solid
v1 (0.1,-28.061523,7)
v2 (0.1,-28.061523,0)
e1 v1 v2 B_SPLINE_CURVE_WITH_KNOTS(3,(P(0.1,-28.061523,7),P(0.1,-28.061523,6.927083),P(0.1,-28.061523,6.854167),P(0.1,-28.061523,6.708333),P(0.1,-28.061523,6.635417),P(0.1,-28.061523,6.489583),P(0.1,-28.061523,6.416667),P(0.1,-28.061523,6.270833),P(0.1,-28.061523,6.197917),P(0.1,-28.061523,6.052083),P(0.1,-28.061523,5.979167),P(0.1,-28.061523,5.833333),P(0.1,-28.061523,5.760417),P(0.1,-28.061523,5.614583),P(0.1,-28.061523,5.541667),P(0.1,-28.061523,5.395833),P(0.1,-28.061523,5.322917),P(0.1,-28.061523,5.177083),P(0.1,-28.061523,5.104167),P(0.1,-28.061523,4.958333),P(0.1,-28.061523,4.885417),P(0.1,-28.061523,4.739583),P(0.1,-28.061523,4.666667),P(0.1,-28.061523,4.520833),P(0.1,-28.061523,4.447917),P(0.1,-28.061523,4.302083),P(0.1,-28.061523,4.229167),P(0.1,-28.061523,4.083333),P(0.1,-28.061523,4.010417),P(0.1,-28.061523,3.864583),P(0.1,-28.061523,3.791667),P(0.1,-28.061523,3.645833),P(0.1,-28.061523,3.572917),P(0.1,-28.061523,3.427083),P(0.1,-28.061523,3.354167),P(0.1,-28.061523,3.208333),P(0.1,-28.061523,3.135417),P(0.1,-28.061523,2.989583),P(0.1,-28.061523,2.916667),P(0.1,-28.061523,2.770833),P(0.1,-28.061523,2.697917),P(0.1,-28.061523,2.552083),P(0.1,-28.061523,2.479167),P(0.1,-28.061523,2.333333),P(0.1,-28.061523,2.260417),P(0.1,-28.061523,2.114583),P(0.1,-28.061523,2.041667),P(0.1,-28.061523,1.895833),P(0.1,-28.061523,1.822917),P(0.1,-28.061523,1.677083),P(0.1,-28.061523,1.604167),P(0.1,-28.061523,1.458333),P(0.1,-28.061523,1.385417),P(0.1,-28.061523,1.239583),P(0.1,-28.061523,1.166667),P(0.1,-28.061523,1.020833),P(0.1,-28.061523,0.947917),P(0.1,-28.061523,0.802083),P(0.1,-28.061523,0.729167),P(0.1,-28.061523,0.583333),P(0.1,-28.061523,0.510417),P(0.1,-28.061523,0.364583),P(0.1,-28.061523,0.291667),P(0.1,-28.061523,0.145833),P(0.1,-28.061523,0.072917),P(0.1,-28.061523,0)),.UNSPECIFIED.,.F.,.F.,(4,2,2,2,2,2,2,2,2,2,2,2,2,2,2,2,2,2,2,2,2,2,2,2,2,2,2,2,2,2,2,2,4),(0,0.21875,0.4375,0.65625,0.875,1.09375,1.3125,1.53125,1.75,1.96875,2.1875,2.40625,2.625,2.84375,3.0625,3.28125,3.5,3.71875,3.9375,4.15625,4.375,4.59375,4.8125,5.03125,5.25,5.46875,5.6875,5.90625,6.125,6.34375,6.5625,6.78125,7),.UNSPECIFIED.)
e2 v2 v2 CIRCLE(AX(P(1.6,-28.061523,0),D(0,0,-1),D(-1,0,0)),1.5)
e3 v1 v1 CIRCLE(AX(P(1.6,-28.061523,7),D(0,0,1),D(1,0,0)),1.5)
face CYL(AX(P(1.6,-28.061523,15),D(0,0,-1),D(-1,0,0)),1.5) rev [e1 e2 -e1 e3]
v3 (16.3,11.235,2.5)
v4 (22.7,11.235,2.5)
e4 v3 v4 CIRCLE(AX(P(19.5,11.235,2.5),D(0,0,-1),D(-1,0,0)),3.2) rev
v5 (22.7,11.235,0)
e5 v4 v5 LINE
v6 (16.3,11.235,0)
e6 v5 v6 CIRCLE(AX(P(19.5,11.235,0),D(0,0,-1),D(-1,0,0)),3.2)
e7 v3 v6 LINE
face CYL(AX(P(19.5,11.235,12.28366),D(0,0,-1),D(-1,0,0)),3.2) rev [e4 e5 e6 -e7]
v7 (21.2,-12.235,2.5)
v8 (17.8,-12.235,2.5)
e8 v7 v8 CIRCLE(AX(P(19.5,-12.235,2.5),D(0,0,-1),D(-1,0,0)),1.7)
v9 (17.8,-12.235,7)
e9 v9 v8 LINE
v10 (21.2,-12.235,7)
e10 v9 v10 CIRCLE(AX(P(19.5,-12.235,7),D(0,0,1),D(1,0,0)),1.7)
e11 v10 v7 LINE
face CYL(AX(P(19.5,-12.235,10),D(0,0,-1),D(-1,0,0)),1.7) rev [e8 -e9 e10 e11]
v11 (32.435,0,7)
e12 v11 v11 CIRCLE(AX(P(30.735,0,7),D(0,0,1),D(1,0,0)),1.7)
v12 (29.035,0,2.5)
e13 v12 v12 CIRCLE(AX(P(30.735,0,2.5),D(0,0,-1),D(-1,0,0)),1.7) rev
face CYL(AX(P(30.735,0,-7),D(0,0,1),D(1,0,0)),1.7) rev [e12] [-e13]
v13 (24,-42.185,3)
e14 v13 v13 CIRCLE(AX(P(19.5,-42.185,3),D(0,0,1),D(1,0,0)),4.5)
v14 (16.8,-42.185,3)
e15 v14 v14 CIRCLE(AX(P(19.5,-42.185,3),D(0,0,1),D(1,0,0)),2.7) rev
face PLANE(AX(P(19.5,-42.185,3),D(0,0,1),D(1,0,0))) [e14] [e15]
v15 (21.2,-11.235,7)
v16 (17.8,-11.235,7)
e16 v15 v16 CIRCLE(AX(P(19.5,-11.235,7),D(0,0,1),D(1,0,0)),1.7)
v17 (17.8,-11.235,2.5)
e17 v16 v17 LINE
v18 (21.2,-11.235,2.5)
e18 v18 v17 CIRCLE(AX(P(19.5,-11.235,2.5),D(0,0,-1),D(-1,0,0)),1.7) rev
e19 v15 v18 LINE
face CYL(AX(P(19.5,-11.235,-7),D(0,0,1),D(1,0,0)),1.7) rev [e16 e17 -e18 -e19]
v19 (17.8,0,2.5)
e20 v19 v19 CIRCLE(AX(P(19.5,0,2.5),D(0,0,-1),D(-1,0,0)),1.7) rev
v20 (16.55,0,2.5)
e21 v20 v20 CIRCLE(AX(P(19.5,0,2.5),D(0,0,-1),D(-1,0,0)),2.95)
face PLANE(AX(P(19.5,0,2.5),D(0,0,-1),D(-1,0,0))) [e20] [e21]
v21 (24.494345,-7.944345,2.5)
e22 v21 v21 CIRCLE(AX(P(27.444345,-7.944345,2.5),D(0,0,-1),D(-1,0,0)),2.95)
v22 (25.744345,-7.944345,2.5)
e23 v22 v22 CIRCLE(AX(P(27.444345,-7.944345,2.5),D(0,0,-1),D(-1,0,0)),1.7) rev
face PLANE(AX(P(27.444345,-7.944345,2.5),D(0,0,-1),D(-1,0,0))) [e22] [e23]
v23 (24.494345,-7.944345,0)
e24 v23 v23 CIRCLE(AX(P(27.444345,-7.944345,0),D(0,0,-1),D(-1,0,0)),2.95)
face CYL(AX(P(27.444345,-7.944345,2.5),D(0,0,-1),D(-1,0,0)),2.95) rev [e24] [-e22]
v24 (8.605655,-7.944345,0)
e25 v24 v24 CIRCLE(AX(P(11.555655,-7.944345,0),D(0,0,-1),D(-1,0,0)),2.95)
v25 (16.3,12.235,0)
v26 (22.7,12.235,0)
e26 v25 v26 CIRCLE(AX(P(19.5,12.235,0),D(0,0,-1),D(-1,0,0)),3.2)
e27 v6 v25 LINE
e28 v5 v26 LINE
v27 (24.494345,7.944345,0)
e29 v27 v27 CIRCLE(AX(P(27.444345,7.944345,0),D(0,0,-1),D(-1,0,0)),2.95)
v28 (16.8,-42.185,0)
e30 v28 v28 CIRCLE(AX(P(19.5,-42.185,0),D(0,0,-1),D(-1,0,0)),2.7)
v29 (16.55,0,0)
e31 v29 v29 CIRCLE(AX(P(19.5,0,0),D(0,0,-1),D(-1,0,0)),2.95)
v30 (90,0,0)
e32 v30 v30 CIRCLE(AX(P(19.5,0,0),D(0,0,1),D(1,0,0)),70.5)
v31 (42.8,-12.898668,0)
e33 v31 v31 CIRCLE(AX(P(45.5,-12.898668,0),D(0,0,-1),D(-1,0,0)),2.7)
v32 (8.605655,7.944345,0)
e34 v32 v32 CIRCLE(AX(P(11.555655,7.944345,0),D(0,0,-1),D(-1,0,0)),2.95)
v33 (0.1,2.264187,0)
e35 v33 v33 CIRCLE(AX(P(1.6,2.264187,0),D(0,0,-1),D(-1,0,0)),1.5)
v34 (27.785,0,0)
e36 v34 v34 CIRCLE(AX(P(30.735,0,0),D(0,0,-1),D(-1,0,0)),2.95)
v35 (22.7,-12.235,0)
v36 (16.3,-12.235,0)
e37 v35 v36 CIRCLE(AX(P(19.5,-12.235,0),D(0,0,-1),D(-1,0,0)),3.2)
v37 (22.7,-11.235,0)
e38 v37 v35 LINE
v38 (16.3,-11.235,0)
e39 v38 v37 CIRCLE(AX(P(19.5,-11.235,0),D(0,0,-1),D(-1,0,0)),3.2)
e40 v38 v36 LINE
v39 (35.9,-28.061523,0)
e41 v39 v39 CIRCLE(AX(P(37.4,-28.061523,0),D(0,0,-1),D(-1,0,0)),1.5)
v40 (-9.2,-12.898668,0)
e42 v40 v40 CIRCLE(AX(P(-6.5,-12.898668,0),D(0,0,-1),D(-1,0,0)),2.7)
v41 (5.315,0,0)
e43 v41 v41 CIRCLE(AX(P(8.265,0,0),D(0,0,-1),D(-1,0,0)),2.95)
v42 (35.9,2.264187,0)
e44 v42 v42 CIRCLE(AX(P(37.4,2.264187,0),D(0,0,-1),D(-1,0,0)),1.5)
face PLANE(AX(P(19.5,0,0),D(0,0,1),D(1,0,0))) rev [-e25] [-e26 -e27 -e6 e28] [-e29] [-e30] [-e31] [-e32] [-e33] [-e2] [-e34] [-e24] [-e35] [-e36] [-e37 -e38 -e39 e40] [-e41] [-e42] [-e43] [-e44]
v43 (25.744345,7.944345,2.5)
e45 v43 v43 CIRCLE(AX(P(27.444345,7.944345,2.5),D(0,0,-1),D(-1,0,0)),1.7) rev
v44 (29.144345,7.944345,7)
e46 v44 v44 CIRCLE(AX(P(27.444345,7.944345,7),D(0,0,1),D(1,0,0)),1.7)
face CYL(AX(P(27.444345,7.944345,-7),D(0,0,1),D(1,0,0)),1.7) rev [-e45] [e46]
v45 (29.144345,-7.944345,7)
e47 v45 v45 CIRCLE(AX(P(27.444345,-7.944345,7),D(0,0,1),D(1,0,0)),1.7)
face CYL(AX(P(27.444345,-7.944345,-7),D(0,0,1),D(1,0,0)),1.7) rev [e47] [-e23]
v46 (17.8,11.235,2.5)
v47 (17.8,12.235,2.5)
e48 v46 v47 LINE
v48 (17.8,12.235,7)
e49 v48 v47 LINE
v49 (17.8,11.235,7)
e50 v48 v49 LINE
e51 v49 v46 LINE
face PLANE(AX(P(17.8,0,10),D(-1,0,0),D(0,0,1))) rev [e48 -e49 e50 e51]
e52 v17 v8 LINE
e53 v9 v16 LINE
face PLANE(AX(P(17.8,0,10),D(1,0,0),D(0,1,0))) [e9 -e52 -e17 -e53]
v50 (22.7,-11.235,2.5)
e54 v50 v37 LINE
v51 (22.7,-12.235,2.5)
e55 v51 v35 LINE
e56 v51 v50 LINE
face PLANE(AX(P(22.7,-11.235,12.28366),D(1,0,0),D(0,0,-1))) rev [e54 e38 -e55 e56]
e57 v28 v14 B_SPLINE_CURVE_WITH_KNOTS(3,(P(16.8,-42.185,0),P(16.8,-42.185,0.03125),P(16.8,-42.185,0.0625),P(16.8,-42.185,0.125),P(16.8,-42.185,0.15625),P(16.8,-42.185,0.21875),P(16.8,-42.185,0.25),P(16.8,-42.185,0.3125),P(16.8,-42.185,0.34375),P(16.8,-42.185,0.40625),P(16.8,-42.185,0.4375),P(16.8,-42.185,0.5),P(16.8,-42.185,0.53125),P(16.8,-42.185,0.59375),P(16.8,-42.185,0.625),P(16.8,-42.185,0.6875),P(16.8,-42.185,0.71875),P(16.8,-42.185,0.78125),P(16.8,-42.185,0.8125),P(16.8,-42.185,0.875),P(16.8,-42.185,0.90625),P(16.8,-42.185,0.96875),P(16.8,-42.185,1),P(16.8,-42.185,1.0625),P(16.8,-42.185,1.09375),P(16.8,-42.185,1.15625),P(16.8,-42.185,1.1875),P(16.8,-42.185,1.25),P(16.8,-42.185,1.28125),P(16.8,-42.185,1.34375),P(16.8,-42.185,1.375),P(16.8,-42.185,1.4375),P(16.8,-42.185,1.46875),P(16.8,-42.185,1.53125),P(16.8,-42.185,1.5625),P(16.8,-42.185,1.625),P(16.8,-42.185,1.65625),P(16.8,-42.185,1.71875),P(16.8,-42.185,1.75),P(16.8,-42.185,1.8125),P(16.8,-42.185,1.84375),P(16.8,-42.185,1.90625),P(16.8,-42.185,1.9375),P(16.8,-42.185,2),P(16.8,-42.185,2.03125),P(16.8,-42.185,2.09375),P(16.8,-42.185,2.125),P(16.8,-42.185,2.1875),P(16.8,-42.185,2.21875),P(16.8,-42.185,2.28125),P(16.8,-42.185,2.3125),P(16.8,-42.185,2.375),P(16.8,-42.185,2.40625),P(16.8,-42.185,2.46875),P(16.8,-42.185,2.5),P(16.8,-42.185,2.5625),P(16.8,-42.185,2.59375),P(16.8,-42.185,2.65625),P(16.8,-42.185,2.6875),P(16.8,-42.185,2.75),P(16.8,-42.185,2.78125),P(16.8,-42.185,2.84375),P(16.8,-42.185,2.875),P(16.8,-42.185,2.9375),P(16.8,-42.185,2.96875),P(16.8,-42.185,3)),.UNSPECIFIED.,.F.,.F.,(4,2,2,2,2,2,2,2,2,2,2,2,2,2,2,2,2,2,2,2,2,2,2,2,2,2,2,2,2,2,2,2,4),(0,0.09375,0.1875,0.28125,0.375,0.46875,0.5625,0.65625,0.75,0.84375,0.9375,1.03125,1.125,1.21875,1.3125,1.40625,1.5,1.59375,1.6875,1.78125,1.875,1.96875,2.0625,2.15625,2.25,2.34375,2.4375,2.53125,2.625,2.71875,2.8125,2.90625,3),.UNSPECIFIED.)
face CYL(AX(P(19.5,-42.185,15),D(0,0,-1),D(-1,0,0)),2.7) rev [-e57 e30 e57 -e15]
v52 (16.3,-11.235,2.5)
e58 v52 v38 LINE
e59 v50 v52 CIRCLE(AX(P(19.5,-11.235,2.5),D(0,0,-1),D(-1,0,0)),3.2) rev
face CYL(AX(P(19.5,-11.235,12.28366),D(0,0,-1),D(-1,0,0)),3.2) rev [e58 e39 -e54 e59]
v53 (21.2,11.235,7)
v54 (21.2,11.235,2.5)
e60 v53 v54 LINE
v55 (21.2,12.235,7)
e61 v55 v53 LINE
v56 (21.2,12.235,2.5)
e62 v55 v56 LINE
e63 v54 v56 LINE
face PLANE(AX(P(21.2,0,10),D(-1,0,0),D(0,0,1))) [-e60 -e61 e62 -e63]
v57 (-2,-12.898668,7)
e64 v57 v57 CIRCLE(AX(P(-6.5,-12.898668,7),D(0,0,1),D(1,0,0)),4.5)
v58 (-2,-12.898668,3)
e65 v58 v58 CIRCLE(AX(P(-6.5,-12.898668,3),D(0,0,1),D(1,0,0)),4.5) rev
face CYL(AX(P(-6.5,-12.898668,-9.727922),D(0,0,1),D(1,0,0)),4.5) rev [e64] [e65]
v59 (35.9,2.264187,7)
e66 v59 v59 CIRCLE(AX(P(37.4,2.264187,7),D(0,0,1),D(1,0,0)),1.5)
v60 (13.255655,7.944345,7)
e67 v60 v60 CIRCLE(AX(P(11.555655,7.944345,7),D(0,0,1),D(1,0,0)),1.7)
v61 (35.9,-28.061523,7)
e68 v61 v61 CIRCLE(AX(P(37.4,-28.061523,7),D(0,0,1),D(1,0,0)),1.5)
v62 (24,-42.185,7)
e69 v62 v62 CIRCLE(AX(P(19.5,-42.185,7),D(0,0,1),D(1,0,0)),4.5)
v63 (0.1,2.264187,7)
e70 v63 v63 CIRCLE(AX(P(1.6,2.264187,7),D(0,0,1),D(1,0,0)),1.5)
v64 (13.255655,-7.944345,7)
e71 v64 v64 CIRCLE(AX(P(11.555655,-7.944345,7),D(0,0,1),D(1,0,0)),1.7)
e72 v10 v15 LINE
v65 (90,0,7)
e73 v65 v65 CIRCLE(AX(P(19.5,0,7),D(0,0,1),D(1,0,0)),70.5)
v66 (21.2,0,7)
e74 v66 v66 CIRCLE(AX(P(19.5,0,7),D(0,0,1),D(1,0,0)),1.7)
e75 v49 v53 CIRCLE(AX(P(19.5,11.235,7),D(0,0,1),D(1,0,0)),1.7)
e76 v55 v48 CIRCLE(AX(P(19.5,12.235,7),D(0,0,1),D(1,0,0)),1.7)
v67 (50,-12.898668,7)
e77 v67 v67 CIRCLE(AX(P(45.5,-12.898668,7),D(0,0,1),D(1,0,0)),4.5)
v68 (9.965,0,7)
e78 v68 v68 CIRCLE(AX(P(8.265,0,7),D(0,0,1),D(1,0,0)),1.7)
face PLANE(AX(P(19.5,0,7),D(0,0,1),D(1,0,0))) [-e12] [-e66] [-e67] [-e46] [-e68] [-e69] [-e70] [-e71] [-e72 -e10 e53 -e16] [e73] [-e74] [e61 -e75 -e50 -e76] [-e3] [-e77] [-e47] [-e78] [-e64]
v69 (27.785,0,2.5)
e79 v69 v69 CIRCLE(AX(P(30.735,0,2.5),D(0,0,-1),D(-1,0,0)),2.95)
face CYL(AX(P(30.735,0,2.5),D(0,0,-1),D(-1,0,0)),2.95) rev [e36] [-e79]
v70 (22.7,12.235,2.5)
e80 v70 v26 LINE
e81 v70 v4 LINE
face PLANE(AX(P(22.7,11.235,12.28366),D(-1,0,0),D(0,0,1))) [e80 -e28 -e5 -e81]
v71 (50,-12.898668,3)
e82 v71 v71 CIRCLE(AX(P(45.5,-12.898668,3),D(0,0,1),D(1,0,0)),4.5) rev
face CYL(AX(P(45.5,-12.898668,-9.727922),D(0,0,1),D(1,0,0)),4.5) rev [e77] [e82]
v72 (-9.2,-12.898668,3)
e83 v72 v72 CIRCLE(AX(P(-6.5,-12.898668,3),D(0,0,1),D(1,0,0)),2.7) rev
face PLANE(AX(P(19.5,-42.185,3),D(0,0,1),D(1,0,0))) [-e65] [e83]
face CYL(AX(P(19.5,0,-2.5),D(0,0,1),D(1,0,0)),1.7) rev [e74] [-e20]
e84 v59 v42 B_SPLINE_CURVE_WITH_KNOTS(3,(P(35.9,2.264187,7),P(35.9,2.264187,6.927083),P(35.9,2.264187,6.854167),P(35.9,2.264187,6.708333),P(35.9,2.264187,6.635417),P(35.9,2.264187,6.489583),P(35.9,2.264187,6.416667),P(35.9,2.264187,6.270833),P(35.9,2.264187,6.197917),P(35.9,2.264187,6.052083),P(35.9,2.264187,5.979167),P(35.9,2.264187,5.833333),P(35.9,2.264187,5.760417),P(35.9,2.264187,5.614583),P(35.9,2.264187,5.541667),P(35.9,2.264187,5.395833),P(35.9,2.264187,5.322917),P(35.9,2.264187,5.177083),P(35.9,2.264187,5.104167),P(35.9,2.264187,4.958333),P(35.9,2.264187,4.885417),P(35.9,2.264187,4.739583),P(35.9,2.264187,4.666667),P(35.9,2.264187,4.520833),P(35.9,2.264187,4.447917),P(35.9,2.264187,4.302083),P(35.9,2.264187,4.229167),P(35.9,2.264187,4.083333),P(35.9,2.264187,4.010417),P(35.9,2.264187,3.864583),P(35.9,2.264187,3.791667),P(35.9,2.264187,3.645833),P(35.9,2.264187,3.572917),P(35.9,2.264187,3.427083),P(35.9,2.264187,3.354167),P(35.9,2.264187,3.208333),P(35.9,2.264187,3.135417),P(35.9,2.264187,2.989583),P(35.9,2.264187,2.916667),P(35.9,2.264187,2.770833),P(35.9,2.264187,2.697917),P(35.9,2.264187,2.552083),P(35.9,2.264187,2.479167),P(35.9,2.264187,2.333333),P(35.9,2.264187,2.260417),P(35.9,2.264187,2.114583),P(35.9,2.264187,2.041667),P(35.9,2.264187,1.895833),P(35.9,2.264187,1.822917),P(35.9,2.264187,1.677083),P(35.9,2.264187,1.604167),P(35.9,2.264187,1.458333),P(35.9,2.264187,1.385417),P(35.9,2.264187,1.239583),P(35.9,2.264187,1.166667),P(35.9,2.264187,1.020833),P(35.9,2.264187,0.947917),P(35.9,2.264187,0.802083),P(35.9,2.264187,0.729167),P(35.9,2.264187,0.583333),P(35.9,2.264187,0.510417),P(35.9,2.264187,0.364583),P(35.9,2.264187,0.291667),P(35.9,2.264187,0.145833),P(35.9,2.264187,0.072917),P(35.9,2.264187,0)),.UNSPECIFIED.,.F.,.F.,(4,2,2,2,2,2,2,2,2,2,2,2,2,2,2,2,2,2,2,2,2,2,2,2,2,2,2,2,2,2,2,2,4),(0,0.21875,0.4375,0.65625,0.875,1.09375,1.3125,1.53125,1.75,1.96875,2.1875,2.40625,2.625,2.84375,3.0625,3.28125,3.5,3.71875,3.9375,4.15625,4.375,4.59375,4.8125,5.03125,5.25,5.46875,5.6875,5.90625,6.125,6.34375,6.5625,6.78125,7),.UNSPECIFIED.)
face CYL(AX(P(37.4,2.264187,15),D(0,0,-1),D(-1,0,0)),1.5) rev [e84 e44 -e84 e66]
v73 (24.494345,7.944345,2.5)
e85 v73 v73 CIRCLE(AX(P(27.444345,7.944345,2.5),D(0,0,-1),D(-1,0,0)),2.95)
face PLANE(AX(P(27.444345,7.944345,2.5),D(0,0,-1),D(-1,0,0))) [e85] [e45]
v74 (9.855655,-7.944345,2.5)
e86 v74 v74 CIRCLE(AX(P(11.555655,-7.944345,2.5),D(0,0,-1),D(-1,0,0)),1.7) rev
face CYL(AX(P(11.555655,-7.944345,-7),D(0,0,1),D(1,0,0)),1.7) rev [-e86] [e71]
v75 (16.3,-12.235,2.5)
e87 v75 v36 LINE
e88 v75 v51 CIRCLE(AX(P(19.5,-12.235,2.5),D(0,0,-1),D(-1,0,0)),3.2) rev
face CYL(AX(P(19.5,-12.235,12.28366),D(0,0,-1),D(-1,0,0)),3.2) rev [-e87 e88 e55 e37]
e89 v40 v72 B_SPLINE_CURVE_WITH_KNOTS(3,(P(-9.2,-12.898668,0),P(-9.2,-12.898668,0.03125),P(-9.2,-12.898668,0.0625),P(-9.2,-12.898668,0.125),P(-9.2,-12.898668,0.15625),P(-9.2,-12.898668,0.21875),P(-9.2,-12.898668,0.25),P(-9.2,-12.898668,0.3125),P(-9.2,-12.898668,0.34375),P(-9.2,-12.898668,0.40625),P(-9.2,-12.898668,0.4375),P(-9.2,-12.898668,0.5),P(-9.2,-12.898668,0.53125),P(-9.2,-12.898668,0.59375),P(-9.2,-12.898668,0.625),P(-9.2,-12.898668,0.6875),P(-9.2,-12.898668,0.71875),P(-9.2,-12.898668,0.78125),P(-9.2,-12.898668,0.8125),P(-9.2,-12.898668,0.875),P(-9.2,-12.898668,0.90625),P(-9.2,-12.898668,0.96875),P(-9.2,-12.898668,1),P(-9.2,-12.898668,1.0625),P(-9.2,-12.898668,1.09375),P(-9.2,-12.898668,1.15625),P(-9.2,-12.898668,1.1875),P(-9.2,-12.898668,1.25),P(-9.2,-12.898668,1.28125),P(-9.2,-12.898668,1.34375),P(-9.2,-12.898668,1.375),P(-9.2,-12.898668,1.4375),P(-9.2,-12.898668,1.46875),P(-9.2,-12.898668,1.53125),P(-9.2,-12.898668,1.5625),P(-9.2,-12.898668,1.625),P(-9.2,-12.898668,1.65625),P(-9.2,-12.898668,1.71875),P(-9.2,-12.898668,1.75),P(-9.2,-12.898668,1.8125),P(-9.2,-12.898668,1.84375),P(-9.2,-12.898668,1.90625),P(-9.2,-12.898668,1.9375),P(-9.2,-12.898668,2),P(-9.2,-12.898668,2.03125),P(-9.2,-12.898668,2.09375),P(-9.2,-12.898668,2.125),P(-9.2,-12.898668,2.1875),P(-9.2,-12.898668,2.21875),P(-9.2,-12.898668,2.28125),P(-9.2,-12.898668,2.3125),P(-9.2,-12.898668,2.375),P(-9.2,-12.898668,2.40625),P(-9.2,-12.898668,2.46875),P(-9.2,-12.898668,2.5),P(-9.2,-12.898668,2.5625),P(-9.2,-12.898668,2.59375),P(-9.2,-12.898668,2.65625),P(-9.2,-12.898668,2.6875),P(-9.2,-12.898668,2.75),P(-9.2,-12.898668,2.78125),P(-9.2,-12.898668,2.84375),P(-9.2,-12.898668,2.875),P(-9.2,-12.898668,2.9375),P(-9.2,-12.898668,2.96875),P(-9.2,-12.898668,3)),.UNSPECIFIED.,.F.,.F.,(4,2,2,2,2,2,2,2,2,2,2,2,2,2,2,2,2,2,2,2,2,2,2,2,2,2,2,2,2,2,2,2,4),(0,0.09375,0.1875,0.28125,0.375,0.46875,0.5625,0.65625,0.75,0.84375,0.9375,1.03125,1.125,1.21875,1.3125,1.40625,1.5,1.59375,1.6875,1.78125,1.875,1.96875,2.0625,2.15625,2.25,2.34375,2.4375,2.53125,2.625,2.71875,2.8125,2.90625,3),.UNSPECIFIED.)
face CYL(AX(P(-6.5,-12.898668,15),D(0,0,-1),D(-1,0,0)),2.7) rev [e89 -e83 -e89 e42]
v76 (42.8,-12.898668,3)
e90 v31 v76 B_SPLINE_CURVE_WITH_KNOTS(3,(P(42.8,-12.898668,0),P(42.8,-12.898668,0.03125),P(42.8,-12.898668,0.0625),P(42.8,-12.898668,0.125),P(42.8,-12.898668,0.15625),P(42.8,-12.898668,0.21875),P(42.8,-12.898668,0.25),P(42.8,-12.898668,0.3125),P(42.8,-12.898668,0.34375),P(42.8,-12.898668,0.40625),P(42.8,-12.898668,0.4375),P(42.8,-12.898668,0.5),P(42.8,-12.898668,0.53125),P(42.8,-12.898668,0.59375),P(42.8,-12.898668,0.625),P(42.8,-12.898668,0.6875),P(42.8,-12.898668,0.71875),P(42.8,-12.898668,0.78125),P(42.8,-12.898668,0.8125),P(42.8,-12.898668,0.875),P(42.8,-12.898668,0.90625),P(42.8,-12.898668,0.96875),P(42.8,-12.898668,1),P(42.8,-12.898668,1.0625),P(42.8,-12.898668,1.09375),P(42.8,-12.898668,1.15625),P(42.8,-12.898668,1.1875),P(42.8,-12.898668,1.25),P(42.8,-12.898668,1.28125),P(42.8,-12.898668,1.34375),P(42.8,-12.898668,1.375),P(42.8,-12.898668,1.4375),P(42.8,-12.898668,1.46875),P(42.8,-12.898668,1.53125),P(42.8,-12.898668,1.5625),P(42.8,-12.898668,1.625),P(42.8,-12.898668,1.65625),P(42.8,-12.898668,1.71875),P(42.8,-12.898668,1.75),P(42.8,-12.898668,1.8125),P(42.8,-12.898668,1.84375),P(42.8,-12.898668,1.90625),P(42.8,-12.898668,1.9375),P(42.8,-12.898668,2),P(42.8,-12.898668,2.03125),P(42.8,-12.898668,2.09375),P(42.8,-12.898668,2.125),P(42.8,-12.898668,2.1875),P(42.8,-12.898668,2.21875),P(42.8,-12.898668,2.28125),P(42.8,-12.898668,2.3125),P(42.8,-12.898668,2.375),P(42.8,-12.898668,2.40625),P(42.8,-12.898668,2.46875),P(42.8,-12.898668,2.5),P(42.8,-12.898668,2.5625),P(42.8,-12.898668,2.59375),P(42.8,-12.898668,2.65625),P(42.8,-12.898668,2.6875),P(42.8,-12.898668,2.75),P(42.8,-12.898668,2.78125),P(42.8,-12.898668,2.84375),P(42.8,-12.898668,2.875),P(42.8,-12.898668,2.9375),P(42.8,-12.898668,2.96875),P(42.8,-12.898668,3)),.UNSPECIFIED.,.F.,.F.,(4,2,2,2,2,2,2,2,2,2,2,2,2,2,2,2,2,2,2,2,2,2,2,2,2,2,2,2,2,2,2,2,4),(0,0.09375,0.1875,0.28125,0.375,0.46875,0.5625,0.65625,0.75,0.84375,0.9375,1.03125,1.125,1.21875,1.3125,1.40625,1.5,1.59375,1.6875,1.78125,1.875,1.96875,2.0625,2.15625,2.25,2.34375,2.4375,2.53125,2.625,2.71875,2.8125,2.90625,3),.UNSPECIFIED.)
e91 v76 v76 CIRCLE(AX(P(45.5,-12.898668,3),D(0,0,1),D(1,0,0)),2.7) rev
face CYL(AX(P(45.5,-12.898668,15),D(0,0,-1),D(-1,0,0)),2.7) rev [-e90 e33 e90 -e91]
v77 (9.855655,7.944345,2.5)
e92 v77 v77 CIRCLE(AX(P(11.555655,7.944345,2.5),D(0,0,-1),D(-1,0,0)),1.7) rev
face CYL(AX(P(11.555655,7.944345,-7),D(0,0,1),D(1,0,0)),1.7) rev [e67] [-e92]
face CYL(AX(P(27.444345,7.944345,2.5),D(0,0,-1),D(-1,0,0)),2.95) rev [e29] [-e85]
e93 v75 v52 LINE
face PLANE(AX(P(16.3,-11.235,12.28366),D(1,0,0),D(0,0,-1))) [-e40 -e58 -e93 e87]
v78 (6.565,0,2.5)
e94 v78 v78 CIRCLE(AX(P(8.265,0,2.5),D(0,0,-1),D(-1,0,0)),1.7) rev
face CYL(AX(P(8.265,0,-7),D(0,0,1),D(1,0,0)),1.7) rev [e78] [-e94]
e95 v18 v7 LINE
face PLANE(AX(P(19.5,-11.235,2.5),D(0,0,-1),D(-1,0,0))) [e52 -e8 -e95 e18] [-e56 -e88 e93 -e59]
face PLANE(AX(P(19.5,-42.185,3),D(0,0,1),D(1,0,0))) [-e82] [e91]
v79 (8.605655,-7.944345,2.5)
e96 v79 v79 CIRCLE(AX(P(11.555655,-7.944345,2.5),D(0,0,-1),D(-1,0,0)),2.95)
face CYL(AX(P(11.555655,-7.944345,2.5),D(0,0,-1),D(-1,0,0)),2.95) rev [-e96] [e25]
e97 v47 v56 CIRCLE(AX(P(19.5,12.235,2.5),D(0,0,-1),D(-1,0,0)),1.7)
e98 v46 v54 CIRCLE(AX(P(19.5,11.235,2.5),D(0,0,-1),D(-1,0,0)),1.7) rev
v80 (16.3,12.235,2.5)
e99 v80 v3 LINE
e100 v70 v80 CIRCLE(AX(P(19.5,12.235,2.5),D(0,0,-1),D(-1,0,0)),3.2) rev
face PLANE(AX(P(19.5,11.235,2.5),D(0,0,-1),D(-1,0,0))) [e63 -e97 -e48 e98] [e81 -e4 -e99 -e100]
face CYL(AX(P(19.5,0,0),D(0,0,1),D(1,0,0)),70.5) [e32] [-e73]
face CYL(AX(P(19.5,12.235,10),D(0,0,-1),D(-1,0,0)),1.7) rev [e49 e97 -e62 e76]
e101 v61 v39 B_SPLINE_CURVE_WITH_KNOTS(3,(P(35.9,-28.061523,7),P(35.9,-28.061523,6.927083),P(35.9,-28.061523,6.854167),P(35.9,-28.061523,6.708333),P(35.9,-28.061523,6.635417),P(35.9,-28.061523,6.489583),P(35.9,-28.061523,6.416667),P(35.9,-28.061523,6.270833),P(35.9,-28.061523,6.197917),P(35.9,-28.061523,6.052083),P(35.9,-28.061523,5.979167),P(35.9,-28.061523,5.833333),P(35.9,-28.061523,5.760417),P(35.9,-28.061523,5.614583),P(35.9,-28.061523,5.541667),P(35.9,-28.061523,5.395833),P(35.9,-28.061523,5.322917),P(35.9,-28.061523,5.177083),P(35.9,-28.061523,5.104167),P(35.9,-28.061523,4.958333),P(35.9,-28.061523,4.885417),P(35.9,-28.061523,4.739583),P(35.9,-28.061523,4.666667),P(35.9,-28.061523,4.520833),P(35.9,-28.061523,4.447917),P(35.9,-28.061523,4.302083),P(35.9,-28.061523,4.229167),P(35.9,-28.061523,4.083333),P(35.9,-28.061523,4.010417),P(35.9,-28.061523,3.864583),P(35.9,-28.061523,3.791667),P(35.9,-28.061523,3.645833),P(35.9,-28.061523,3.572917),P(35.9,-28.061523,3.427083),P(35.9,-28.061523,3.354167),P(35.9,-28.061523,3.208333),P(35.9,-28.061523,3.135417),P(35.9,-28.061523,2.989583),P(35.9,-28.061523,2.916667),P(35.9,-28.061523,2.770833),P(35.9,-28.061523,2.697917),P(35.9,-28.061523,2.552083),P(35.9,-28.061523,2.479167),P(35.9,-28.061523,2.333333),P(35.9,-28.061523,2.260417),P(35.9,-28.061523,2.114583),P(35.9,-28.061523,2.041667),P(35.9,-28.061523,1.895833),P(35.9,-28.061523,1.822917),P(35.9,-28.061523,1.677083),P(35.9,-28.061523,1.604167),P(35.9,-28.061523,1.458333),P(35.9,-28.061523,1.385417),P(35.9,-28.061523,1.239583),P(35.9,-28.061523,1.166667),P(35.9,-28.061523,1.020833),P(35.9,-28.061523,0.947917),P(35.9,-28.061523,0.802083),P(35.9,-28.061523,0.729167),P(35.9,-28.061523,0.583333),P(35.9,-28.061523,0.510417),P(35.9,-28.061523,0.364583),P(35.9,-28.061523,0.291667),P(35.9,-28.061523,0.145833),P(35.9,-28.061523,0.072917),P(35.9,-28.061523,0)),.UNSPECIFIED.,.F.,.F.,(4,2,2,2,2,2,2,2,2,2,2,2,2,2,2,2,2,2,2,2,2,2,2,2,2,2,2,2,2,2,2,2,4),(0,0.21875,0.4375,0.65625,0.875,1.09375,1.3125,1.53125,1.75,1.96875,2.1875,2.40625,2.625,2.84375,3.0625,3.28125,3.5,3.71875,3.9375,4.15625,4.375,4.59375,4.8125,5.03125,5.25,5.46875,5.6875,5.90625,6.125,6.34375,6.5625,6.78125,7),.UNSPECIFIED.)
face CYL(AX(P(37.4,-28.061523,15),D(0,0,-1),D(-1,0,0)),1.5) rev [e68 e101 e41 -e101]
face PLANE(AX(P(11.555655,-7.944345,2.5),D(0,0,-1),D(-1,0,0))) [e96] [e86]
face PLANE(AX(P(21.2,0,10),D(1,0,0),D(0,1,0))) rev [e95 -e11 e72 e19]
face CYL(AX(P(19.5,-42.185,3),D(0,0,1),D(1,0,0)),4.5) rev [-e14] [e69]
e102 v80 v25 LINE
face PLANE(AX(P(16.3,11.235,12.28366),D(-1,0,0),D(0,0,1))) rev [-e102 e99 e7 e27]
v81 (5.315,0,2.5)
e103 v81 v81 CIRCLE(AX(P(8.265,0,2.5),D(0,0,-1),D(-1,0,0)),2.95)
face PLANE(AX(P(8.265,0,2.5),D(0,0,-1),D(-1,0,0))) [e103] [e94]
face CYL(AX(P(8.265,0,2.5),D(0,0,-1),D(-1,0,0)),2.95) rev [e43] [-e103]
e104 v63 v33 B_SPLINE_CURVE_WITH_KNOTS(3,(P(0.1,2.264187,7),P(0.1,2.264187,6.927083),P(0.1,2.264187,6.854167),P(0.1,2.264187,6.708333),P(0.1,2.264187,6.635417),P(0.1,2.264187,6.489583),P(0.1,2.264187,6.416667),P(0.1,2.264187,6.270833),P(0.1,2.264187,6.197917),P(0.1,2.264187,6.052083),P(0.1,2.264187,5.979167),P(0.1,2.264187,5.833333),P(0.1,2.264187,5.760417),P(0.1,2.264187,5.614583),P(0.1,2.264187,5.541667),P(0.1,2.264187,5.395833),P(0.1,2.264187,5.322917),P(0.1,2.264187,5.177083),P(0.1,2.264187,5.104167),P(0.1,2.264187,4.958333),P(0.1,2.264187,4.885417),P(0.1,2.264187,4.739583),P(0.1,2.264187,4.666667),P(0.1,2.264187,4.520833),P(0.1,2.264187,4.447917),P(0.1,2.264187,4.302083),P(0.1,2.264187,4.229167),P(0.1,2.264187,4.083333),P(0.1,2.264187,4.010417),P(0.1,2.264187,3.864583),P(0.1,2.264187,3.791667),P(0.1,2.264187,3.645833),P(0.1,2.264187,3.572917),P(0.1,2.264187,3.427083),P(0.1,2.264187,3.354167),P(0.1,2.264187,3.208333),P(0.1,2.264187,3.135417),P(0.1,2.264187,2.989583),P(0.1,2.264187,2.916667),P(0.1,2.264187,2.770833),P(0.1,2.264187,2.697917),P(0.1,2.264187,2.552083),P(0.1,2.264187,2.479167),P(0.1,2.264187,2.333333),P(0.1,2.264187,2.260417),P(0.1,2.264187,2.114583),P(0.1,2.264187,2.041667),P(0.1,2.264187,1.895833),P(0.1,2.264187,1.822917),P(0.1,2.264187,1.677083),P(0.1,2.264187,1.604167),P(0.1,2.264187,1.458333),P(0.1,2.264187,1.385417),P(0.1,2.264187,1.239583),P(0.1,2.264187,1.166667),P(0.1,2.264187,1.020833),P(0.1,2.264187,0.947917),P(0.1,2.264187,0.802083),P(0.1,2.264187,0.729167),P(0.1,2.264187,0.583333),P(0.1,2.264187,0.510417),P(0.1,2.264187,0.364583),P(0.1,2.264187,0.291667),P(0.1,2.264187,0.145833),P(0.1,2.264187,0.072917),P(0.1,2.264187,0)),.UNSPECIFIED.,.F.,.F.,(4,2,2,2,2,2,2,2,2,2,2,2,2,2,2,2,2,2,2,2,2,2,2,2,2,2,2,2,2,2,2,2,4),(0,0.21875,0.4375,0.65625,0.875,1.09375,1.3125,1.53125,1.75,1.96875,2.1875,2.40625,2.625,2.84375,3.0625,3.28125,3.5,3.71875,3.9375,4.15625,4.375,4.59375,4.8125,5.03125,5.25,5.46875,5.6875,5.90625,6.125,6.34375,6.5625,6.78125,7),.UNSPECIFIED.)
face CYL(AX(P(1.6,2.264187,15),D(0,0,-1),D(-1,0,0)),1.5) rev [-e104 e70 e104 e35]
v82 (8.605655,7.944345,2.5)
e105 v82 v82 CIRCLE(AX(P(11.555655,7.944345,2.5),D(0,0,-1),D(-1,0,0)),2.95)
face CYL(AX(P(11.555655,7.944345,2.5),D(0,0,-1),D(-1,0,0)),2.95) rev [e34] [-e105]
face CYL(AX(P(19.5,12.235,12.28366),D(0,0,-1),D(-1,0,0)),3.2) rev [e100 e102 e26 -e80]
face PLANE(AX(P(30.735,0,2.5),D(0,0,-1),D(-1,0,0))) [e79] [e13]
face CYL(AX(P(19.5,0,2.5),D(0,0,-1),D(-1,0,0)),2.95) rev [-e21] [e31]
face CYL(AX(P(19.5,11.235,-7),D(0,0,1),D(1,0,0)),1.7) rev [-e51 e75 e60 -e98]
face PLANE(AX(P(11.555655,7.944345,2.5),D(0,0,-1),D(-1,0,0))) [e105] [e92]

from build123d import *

# Parameters (mm, degrees)
SKETCH1_R           = 65.5
SKETCH1_R_2         = 1.7
BOSS_EXTRUDE1_DEPTH = 7
BOSS_EXTRUDE2_START = -7
SKETCH2_R           = 70.5
SKETCH2_R_2         = 65.5
BOSS_EXTRUDE2_DEPTH = 7
SKETCH5_R           = 2.7
SKETCH5_R_2         = 2.699999999
SKETCH5_R_3         = 1.5
SKETCH5_R_4         = 1.499999999
CUT_EXTRUDE3_DEPTH  = 15
SKETCH6_R           = 4.500000001
CUT_EXTRUDE4_DEPTH  = 4
BOSS_EXTRUDE3_START = -7
SKETCH8_R           = 1.7
BOSS_EXTRUDE3_DEPTH = 7
SKETCH9_R           = 1.7
CUT_EXTRUDE5_DEPTH  = 14
SKETCH10_R          = 2.95
CUT_EXTRUDE6_DEPTH  = 2.5
SKETCH11_R          = 1.7
CUT_EXTRUDE7_DEPTH  = 9.5
SKETCH12_R          = 2.95
CUT_EXTRUDE8_DEPTH  = 2.5
CUT_EXTRUDE9_START  = -7
CUT_EXTRUDE9_DEPTH  = 4.5
CUT_EXTRUDE11_DEPTH = 2.5
SKETCH15_R          = 4.5
CUT_EXTRUDE12_DEPTH = 4
CUT_EXTRUDE13_DEPTH = 2.5


# Read off the part's stored shape, not the designer's step: Cut-Extrude9
with BuildPart() as part:
    # Sketch1 → Boss-Extrude1 (new body)
    with BuildSketch(Plane.XY):
        with Locations((19.5, 0)):
            Circle(SKETCH1_R)
        with Locations((26.5, 0)):
            Circle(SKETCH1_R_2, mode=Mode.SUBTRACT)
        with Locations((19.5, -7)):
            Circle(SKETCH1_R_2, mode=Mode.SUBTRACT)
        with Locations((12.5, 0)):
            Circle(SKETCH1_R_2, mode=Mode.SUBTRACT)
        with Locations((19.5, 7)):
            Circle(SKETCH1_R_2, mode=Mode.SUBTRACT)
    extrude(amount=BOSS_EXTRUDE1_DEPTH)

    # Sketch2 → Boss-Extrude2 (add)
    with BuildSketch(Plane.XY.offset(7).offset(BOSS_EXTRUDE2_START)):
        with Locations((19.5, 0)):
            Circle(SKETCH2_R)
        with Locations((19.5, 0)):
            Circle(SKETCH2_R_2, mode=Mode.SUBTRACT)
    extrude(amount=BOSS_EXTRUDE2_DEPTH)

    # Sketch5 → Cut-Extrude3 (cut)
    with BuildSketch(Plane(origin=(0, 0, 0), x_dir=(-1, 0, 0), z_dir=(0, 0, -1))):
        with Locations((-45.499999999, -12.898668068)):
            Circle(SKETCH5_R)
        with Locations((6.5, -12.898668066)):
            Circle(SKETCH5_R_2)
        with Locations((-19.499999998, -42.185)):
            Circle(SKETCH5_R_2)
        with Locations((-37.4, 2.264186636)):
            Circle(SKETCH5_R_3)
        with Locations((-37.399999999, -28.061522771)):
            Circle(SKETCH5_R_4)
        with Locations((-1.599999999, -28.06152277)):
            Circle(SKETCH5_R_4)
        with Locations((-1.6, 2.264186638)):
            Circle(SKETCH5_R_3)
    extrude(amount=-CUT_EXTRUDE3_DEPTH, mode=Mode.SUBTRACT)

    # Sketch6 → Cut-Extrude4 (cut)
    with BuildSketch(Plane.XY.offset(7)):
        with Locations((19.499999998, -42.185)):
            Circle(SKETCH6_R)
    extrude(amount=-CUT_EXTRUDE4_DEPTH, mode=Mode.SUBTRACT)

    # Sketch8 → Boss-Extrude3 (add)
    with BuildSketch(Plane.XY.offset(7).offset(BOSS_EXTRUDE3_START)):
        with Locations((12.5, 0)):
            Circle(SKETCH8_R)
        with Locations((19.5, -7)):
            Circle(SKETCH8_R)
        with Locations((26.5, 0)):
            Circle(SKETCH8_R)
        with Locations((19.5, 7)):
            Circle(SKETCH8_R)
    extrude(amount=BOSS_EXTRUDE3_DEPTH)

    # Sketch9 → Cut-Extrude5 (cut)
    with BuildSketch(Plane.XY.offset(7)):
        with Locations((19.5, 11.235)):
            Circle(SKETCH9_R)
        with Locations((27.444344687, 7.944344686)):
            Circle(SKETCH9_R)
        with Locations((30.735, -1e-09)):
            Circle(SKETCH9_R)
        with Locations((27.444344686, -7.944344687)):
            Circle(SKETCH9_R)
        with Locations((19.5, -11.235)):
            Circle(SKETCH9_R)
        with Locations((11.555655313, -7.944344687)):
            Circle(SKETCH9_R)
        with Locations((8.265, 0)):
            Circle(SKETCH9_R)
        with Locations((11.555655314, 7.944344686)):
            Circle(SKETCH9_R)
    extrude(amount=-CUT_EXTRUDE5_DEPTH, mode=Mode.SUBTRACT)

    # Sketch10 → Cut-Extrude6 (cut)
    with BuildSketch(Plane(origin=(0, 0, 0), x_dir=(-1, 0, 0), z_dir=(0, 0, -1))):
        with Locations((-19.5, -11.235)):
            Circle(SKETCH10_R)
        with Locations((-27.444344687, -7.944344687)):
            Circle(SKETCH10_R)
        with Locations((-30.735, 0)):
            Circle(SKETCH10_R)
        with Locations((-27.444344687, 7.944344687)):
            Circle(SKETCH10_R)
        with Locations((-19.5, 11.235)):
            Circle(SKETCH10_R)
        with Locations((-11.555655313, 7.944344687)):
            Circle(SKETCH10_R)
        with Locations((-8.265, 0)):
            Circle(SKETCH10_R)
        with Locations((-11.555655313, -7.944344687)):
            Circle(SKETCH10_R)
    extrude(amount=-CUT_EXTRUDE6_DEPTH, mode=Mode.SUBTRACT)

    # Sketch11 → Cut-Extrude7 (cut)
    with BuildSketch(Plane.XY.offset(7)):
        with Locations((19.5, 0)):
            Circle(SKETCH11_R)
    extrude(amount=-CUT_EXTRUDE7_DEPTH, mode=Mode.SUBTRACT)

    # Sketch12 → Cut-Extrude8 (cut)
    with BuildSketch(Plane(origin=(0, 0, 0), x_dir=(-1, 0, 0), z_dir=(0, 0, -1))):
        with Locations((-19.5, 0)):
            Circle(SKETCH12_R)
    extrude(amount=-CUT_EXTRUDE8_DEPTH, mode=Mode.SUBTRACT)

    # Cut-Extrude9 outline → Cut-Extrude9 (cut)
    with BuildSketch(Plane(origin=(0, 0, 0), x_dir=(-1, 0, 0), z_dir=(0, 0, -1)).offset(CUT_EXTRUDE9_START)):
        with BuildLine():
            Line((-21.2, -11.235), (-21.199999984, -12.235))
            ThreePointArc((-21.199999984, -12.235), (-19.499999992, -13.934999993), (-17.8, -12.235))
            Line((-17.8, -12.235), (-17.8, -11.235))
            ThreePointArc((-17.8, -11.235), (-19.5, -12.935), (-21.2, -11.235))
        make_face()
        with BuildLine():
            Line((-21.2, 12.235), (-21.2, 11.235))
            ThreePointArc((-21.2, 11.235), (-19.5, 12.935), (-17.8, 11.235))
            Line((-17.8, 11.235), (-17.8, 12.235))
            ThreePointArc((-17.8, 12.235), (-19.5, 13.935), (-21.2, 12.235))
        make_face()
    extrude(amount=CUT_EXTRUDE9_DEPTH, mode=Mode.SUBTRACT)

    # Sketch14 → Cut-Extrude11 (cut)
    with BuildSketch(Plane(origin=(0, 0, 0), x_dir=(-1, 0, 0), z_dir=(0, 0, -1))):
        with BuildLine():
            Line((-22.45, 11.235), (-22.45, 12.235))
            ThreePointArc((-22.45, 12.235), (-19.5, 15.185), (-16.55, 12.235))
            Line((-16.55, 12.235), (-16.55, 11.235))
            ThreePointArc((-16.55, 11.235), (-19.5, 8.285), (-22.45, 11.235))
        make_face()
        with BuildLine():
            Line((-16.549999992, -11.235), (-16.549999992, -12.235))
            ThreePointArc((-16.549999992, -12.235), (-19.499999992, -15.185000015), (-22.450000007, -12.235))
            Line((-22.450000007, -12.235), (-22.450000007, -11.235))
            ThreePointArc((-22.450000007, -11.235), (-19.5, -8.284999993), (-16.549999992, -11.235))
        make_face()
    extrude(amount=-CUT_EXTRUDE11_DEPTH, mode=Mode.SUBTRACT)

    # Sketch15 → Cut-Extrude12 (cut)
    with BuildSketch(Plane.XY.offset(7)):
        with Locations((45.499999999, -12.898668068)):
            Circle(SKETCH15_R)
        with Locations((-6.5, -12.898668066)):
            Circle(SKETCH15_R)
    extrude(amount=-CUT_EXTRUDE12_DEPTH, mode=Mode.SUBTRACT)

    # Sketch16 → Cut-Extrude13 (cut)
    with BuildSketch(Plane(origin=(0, 0, 0), x_dir=(-1, 0, 0), z_dir=(0, 0, -1))):
        with BuildLine():
            Line((-22.7, 11.235), (-22.7, 12.235))
            ThreePointArc((-22.7, 12.235), (-19.5, 15.435), (-16.3, 12.235))
            Line((-16.3, 12.235), (-16.3, 11.235))
            ThreePointArc((-16.3, 11.235), (-19.5, 8.035), (-22.7, 11.235))
        make_face()
        with BuildLine():
            Line((-16.3, -11.235), (-16.3, -12.235))
            ThreePointArc((-16.3, -12.235), (-19.499999992, -15.435000008), (-22.7, -12.235))
            Line((-22.7, -12.235), (-22.7, -11.235))
            ThreePointArc((-22.7, -11.235), (-19.5, -8.035), (-16.3, -11.235))
        make_face()
    extrude(amount=-CUT_EXTRUDE13_DEPTH, mode=Mode.SUBTRACT)


solid = part.part
